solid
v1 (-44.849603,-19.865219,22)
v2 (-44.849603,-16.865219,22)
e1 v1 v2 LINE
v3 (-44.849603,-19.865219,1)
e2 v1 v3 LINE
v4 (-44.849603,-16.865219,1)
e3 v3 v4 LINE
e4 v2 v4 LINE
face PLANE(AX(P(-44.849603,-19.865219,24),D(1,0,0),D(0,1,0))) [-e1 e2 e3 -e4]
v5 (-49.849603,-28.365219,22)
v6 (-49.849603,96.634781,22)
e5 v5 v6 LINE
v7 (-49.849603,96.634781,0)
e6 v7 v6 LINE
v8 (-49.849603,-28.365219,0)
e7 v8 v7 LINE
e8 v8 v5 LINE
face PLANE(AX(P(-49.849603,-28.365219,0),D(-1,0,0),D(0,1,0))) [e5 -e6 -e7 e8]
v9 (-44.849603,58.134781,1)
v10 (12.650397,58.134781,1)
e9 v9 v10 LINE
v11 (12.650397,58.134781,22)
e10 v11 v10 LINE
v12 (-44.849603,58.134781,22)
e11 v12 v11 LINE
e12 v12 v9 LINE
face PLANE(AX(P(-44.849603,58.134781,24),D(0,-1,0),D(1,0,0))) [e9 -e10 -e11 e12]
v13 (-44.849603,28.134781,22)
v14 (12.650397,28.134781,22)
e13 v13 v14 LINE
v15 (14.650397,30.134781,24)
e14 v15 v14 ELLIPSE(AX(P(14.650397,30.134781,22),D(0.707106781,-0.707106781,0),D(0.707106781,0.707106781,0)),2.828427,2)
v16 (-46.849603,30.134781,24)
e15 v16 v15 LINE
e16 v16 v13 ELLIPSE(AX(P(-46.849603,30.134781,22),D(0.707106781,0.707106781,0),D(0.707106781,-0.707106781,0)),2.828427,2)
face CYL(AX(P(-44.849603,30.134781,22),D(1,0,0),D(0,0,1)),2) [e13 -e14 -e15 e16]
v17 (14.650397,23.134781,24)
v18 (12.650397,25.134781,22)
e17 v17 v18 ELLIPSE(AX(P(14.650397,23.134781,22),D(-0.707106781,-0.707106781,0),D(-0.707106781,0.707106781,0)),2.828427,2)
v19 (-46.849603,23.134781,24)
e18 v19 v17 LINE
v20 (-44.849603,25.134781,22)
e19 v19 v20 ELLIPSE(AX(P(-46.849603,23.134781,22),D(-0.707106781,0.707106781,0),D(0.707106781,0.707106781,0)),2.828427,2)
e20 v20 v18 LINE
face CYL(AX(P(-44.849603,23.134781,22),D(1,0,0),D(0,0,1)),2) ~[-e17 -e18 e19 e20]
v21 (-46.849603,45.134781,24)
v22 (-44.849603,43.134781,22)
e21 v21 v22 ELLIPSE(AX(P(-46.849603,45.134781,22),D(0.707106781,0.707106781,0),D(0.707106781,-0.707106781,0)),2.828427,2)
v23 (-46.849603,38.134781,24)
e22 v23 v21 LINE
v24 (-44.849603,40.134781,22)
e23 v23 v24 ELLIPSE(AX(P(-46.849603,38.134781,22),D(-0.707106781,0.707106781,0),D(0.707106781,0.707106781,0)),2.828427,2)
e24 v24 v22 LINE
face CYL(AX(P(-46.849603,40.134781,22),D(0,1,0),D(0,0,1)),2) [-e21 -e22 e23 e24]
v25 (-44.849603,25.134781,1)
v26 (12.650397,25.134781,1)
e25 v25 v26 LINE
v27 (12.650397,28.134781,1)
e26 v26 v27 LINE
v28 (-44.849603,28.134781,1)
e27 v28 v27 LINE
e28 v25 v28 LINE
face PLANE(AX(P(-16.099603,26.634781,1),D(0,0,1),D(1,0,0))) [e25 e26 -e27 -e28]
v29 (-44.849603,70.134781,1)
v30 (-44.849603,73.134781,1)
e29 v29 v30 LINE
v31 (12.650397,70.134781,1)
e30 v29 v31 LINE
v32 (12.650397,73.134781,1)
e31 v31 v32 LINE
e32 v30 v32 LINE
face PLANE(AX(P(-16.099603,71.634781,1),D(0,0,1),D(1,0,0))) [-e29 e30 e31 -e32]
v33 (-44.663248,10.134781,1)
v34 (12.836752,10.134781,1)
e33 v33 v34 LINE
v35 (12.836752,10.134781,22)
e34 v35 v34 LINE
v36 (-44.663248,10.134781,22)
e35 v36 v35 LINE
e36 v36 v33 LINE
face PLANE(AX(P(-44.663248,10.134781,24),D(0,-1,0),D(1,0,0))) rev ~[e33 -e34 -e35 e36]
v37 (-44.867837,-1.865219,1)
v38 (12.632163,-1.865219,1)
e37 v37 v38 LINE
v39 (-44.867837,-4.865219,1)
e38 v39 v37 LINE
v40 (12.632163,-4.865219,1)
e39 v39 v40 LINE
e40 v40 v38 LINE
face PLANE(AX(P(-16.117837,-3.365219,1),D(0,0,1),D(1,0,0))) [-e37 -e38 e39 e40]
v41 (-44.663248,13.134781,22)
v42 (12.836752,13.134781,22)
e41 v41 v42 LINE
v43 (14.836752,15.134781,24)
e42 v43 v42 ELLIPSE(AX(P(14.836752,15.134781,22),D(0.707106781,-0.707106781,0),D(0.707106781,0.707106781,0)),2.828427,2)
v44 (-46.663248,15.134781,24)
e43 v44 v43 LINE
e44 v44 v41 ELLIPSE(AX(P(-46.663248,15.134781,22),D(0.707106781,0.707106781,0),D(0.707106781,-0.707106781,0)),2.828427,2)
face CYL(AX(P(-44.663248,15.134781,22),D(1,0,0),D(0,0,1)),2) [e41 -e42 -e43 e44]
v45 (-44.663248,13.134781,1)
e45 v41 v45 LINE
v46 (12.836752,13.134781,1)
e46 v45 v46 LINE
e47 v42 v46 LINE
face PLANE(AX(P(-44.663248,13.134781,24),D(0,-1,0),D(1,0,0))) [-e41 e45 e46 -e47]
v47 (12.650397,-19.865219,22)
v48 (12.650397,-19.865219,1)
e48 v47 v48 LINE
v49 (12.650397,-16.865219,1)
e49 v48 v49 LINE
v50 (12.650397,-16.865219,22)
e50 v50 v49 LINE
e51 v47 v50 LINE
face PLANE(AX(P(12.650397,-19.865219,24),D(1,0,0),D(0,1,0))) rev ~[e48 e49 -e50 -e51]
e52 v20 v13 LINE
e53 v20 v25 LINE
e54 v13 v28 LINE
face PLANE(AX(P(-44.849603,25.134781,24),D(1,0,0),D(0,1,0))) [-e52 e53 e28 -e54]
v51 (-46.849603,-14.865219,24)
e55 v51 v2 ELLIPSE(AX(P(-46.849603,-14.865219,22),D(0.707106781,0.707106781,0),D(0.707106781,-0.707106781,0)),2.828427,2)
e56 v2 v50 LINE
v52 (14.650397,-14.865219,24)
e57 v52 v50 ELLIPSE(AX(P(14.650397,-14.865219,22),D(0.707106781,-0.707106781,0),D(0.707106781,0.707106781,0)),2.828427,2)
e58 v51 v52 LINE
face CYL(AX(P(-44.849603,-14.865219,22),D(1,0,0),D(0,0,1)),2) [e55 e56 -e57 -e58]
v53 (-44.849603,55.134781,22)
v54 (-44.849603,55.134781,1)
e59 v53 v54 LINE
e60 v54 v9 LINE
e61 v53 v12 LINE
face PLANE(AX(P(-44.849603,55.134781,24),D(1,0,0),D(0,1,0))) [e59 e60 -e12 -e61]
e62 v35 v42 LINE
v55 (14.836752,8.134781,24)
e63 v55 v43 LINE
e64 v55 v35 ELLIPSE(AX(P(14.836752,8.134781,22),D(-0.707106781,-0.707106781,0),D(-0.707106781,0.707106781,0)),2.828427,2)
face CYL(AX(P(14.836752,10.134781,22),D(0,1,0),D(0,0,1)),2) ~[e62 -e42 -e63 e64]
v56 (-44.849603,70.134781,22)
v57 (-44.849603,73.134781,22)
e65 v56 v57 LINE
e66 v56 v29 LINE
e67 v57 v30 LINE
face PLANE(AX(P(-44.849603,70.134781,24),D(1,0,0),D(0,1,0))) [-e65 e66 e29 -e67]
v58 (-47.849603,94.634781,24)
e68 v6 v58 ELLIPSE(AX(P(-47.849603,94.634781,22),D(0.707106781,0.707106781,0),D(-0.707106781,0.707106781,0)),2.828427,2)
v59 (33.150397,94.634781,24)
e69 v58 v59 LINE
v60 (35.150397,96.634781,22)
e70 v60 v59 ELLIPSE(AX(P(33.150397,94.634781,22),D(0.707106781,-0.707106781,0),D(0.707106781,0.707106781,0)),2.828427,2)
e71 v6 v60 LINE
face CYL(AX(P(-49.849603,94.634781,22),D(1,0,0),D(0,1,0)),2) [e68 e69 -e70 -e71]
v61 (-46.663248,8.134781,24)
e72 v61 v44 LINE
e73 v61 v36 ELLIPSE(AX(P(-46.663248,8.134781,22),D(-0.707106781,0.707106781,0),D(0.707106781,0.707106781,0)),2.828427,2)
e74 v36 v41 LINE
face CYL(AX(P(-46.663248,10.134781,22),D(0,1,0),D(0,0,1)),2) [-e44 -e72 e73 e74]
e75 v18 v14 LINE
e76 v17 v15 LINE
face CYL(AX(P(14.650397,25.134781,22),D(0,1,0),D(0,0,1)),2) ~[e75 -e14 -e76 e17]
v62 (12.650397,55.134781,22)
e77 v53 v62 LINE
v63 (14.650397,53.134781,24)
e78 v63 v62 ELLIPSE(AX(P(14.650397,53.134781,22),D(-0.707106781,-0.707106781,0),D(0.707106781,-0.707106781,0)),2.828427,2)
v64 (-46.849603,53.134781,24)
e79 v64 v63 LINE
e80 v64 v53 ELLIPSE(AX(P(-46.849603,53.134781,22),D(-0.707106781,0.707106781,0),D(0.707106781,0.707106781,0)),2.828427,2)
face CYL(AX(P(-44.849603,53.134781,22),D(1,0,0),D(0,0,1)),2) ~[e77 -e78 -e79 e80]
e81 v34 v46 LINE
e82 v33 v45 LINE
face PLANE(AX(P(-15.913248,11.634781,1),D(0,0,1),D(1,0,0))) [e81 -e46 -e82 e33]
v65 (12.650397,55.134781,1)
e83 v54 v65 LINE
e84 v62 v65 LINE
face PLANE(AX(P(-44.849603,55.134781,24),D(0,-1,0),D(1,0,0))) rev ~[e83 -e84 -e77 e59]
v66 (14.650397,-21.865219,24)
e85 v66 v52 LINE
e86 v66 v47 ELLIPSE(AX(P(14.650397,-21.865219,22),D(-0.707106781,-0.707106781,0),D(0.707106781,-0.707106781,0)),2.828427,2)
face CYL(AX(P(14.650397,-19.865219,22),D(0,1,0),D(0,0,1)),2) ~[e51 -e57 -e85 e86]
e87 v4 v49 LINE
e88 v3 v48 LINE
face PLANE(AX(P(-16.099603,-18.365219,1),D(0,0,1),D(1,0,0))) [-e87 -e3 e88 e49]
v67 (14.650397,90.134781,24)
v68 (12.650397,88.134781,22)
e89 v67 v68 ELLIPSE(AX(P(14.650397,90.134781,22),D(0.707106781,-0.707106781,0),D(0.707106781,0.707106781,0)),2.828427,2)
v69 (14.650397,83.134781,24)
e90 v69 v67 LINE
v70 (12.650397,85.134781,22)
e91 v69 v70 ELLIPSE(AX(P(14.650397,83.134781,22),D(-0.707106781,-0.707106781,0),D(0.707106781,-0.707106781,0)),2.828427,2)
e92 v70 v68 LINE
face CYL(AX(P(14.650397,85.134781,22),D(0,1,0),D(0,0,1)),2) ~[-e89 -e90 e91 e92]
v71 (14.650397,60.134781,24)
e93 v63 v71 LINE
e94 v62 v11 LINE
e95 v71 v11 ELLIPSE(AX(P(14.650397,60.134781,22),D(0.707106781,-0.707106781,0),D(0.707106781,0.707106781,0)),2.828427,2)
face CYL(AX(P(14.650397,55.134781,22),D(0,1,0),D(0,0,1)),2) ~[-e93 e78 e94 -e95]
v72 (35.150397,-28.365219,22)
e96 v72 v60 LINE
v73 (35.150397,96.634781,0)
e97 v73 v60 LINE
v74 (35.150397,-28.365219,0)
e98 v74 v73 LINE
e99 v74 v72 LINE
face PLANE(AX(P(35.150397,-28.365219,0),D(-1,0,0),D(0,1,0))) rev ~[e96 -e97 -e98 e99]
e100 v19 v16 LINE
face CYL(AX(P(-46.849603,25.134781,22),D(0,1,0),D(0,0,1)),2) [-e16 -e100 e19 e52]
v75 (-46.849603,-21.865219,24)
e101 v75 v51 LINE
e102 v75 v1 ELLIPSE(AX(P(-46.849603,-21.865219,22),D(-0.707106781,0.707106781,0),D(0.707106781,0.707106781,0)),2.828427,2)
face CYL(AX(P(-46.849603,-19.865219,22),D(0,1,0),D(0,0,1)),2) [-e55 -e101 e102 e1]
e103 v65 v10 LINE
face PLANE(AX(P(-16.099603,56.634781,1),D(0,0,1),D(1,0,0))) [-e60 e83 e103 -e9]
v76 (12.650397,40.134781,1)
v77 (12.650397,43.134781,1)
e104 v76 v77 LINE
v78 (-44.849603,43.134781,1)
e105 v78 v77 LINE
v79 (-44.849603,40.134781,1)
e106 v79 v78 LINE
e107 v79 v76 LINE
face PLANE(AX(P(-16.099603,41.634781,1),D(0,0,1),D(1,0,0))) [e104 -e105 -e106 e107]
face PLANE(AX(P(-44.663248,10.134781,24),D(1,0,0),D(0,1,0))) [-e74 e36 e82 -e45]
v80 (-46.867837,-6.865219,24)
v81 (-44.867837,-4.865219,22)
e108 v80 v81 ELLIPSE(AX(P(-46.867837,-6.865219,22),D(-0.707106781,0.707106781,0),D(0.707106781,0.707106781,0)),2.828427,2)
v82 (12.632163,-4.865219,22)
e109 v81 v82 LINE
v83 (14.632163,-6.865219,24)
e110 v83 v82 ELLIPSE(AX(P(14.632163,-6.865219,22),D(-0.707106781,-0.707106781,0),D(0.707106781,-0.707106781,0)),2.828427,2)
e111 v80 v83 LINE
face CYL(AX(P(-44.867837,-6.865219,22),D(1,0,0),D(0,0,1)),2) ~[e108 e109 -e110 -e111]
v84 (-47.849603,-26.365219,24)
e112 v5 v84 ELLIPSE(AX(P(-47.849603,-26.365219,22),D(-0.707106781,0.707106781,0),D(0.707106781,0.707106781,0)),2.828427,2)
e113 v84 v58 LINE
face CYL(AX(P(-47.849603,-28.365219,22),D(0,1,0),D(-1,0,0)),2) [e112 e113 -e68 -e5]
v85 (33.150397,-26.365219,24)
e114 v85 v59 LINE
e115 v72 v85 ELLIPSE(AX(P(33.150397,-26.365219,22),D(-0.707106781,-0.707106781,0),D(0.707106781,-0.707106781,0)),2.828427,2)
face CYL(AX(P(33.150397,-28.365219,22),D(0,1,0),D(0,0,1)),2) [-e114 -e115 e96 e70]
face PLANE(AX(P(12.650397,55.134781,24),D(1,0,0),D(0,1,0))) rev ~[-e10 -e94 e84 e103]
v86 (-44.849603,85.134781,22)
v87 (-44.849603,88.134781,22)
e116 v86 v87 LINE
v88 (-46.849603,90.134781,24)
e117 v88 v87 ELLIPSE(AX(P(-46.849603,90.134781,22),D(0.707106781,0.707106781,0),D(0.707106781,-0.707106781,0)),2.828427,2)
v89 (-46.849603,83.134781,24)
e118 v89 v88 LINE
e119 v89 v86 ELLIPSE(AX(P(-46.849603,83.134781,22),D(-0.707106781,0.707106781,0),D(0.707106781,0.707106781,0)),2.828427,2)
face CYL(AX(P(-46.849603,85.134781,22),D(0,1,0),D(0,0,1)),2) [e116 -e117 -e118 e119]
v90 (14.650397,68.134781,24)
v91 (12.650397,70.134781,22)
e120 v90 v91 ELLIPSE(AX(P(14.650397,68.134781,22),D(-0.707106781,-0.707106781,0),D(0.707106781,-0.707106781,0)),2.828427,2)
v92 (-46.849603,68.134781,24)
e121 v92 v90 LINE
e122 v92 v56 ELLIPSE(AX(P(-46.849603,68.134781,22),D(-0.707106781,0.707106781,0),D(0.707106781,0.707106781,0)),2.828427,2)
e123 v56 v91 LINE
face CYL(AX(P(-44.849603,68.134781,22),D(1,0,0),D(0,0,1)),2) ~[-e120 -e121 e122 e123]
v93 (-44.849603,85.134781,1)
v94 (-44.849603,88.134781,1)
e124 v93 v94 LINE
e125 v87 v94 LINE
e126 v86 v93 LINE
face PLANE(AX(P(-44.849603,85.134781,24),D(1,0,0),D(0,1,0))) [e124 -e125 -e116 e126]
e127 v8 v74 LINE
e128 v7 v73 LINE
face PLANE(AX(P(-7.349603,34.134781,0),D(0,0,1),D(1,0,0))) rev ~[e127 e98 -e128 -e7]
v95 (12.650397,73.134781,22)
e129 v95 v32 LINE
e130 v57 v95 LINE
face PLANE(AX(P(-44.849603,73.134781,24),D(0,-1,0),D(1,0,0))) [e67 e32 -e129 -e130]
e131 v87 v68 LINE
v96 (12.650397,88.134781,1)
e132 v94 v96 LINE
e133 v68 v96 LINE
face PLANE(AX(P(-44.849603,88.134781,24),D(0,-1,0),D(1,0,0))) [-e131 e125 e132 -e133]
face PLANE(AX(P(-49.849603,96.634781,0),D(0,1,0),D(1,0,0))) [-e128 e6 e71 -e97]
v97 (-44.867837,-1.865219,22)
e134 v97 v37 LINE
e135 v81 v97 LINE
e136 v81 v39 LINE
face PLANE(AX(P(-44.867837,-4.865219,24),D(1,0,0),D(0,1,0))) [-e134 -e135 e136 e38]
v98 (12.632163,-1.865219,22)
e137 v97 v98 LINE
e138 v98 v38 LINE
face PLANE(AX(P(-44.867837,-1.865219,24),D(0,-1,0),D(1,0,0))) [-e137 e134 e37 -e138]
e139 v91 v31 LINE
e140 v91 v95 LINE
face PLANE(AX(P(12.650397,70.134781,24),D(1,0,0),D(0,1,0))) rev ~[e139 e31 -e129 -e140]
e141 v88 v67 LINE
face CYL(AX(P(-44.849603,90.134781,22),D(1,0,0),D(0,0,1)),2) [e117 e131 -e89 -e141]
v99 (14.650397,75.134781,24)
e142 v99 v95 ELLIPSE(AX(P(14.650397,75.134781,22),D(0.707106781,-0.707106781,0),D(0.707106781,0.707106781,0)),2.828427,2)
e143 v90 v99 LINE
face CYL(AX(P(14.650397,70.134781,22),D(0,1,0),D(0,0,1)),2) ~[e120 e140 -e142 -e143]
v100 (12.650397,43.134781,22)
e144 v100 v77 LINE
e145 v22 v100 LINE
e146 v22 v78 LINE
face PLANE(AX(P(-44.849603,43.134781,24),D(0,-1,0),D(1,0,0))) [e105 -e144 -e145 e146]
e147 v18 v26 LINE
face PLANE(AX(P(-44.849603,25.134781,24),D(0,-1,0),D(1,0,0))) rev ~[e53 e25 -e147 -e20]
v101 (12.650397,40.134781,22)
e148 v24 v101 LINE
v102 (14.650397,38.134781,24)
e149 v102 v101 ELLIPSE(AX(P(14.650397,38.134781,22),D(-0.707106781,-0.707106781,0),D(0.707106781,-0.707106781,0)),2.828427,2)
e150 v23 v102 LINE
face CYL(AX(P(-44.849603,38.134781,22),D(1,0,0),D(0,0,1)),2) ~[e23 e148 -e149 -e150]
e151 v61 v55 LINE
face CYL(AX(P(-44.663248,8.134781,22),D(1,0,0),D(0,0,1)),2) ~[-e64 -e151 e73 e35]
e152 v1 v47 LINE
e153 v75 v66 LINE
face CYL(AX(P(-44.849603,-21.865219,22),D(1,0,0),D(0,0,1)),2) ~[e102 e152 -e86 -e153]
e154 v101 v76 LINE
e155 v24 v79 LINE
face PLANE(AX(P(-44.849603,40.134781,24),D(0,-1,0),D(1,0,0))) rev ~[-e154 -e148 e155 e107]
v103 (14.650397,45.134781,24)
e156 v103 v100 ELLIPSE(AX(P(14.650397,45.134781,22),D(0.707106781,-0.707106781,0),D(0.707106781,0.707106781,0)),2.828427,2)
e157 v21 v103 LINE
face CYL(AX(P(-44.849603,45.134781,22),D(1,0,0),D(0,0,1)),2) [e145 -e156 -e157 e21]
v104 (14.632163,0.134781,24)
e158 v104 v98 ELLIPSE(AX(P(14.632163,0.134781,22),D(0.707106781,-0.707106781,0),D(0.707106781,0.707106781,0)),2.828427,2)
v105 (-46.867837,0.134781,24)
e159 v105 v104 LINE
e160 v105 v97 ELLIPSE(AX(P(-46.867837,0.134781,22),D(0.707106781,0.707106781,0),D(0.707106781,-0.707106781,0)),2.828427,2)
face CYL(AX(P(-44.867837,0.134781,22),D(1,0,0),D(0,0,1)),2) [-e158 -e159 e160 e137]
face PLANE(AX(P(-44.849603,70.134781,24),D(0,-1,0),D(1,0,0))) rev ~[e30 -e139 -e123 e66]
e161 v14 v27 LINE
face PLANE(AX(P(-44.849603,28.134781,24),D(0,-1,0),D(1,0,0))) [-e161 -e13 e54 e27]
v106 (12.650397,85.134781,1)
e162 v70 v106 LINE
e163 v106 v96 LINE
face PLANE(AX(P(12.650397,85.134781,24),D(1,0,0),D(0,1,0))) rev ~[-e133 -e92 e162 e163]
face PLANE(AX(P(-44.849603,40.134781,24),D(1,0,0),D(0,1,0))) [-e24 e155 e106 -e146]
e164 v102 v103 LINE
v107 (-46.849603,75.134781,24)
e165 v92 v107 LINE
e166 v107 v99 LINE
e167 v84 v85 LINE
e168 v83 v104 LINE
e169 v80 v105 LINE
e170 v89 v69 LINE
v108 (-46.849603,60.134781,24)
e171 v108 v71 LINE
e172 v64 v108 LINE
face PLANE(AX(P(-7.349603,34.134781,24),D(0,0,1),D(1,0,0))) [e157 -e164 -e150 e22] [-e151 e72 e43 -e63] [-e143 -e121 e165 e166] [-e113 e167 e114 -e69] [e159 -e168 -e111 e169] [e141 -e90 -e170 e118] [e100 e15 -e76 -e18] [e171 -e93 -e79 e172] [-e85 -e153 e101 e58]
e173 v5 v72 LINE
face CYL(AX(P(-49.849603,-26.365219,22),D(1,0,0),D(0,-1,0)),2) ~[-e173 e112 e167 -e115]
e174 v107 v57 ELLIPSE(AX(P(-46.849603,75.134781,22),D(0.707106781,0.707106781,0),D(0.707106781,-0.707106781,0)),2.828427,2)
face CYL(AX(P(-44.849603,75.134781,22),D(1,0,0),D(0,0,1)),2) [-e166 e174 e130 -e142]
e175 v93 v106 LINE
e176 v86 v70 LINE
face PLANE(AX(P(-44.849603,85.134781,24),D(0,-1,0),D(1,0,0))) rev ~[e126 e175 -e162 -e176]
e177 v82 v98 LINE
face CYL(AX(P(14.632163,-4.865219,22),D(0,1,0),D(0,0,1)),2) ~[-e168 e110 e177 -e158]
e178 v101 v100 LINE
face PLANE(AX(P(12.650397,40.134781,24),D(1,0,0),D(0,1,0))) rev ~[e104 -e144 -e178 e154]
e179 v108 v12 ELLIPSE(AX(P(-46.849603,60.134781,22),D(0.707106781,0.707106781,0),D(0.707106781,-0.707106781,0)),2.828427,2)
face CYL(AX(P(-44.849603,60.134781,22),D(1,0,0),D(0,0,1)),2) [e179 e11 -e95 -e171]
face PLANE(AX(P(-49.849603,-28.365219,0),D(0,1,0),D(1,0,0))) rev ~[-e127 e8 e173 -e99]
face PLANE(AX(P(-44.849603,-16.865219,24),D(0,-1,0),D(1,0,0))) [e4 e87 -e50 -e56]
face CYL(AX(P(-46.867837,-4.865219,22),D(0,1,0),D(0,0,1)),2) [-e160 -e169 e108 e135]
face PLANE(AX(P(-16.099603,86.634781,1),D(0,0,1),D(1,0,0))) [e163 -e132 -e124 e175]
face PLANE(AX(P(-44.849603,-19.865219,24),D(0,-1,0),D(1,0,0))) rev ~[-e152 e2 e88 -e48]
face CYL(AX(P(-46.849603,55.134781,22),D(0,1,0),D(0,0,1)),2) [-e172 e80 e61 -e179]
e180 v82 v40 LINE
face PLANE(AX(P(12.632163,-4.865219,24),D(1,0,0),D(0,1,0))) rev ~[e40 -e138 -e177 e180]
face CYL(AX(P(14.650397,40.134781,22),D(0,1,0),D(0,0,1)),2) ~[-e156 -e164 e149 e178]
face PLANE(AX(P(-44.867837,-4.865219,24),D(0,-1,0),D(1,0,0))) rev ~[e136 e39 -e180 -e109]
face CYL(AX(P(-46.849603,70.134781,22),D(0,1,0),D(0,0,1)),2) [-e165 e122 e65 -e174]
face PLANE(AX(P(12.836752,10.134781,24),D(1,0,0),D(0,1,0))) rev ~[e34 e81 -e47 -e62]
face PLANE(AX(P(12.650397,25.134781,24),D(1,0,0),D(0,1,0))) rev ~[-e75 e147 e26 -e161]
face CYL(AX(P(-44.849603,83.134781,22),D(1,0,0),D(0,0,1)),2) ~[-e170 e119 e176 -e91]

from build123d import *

# Parameters (mm, degrees)
F0_W     = 85
F0_H     = 125
F1_DEPTH = 24
F2_W     = 57.5
F2_H     = 3
F3_DEPTH = 23
F4_R     = 2


# Not quite as in the source:
# - a feature names something its author has since deleted; it is built from what else it names


with BuildPart() as f1:
    # F0 (on Top) → F1 (new body)
    with BuildSketch(Plane.XY):
        with Locations((-7.3496025801, 34.134781265)):
            Rectangle(F0_W, F0_H)
    extrude(amount=F1_DEPTH)

    # F2 (on face) → F3 (cut)
    with BuildSketch(Plane.XY.offset(24)):
        with Locations((-16.0996025801, -18.365218735)):
            Rectangle(F2_W, F2_H)
        with Locations((-16.11783728, -3.365218735)):
            Rectangle(F2_W, F2_H)
        with Locations((-15.9132478945, 11.634781265)):
            Rectangle(F2_W, F2_H)
        with Locations((-16.0996025801, 26.634781265)):
            Rectangle(F2_W, F2_H)
        with Locations((-16.0996025801, 41.634781265)):
            Rectangle(F2_W, F2_H)
        with Locations((-16.0996025801, 56.634781265)):
            Rectangle(F2_W, F2_H)
        with Locations((-16.0996025801, 71.634781265)):
            Rectangle(F2_W, F2_H)
        with Locations((-16.0996025801, 86.634781265)):
            Rectangle(F2_W, F2_H)
    extrude(amount=-F3_DEPTH, mode=Mode.SUBTRACT)

    # F4
    f4_edges = [f1.edges().sort_by_distance(p)[0] for p in [
        (-16.099603, -19.865219, 24),
        (-16.099603, -16.865219, 24),
        (12.650397, -18.365219, 24),
        (-44.849603, -18.365219, 24),
        (-16.117837, -1.865219, 24),
        (-16.117837, -4.865219, 24),
        (-44.867837, -3.365219, 24),
        (12.632163, -3.365219, 24),
        (-49.849603, 34.134781, 24),
        (-7.349603, 96.634781, 24),
        (-7.349603, -28.365219, 24),
        (35.150397, 34.134781, 24),
        (12.650397, 26.634781, 24),
        (-16.099603, 28.134781, 24),
        (-44.849603, 26.634781, 24),
        (-16.099603, 25.134781, 24),
        (12.836752, 11.634781, 24),
        (-15.913248, 13.134781, 24),
        (-44.663248, 11.634781, 24),
        (-15.913248, 10.134781, 24),
        (-16.099603, 43.134781, 24),
        (-44.849603, 41.634781, 24),
        (-16.099603, 40.134781, 24),
        (12.650397, 41.634781, 24),
        (-16.099603, 58.134781, 24),
        (-44.849603, 56.634781, 24),
        (-16.099603, 55.134781, 24),
        (12.650397, 56.634781, 24),
        (-16.099603, 73.134781, 24),
        (-44.849603, 71.634781, 24),
        (-16.099603, 70.134781, 24),
        (12.650397, 71.634781, 24),
        (-16.099603, 88.134781, 24),
        (-44.849603, 86.634781, 24),
        (-16.099603, 85.134781, 24),
        (12.650397, 86.634781, 24),
    ]]
    fillet(f4_edges, radius=F4_R)


solid = f1.part
